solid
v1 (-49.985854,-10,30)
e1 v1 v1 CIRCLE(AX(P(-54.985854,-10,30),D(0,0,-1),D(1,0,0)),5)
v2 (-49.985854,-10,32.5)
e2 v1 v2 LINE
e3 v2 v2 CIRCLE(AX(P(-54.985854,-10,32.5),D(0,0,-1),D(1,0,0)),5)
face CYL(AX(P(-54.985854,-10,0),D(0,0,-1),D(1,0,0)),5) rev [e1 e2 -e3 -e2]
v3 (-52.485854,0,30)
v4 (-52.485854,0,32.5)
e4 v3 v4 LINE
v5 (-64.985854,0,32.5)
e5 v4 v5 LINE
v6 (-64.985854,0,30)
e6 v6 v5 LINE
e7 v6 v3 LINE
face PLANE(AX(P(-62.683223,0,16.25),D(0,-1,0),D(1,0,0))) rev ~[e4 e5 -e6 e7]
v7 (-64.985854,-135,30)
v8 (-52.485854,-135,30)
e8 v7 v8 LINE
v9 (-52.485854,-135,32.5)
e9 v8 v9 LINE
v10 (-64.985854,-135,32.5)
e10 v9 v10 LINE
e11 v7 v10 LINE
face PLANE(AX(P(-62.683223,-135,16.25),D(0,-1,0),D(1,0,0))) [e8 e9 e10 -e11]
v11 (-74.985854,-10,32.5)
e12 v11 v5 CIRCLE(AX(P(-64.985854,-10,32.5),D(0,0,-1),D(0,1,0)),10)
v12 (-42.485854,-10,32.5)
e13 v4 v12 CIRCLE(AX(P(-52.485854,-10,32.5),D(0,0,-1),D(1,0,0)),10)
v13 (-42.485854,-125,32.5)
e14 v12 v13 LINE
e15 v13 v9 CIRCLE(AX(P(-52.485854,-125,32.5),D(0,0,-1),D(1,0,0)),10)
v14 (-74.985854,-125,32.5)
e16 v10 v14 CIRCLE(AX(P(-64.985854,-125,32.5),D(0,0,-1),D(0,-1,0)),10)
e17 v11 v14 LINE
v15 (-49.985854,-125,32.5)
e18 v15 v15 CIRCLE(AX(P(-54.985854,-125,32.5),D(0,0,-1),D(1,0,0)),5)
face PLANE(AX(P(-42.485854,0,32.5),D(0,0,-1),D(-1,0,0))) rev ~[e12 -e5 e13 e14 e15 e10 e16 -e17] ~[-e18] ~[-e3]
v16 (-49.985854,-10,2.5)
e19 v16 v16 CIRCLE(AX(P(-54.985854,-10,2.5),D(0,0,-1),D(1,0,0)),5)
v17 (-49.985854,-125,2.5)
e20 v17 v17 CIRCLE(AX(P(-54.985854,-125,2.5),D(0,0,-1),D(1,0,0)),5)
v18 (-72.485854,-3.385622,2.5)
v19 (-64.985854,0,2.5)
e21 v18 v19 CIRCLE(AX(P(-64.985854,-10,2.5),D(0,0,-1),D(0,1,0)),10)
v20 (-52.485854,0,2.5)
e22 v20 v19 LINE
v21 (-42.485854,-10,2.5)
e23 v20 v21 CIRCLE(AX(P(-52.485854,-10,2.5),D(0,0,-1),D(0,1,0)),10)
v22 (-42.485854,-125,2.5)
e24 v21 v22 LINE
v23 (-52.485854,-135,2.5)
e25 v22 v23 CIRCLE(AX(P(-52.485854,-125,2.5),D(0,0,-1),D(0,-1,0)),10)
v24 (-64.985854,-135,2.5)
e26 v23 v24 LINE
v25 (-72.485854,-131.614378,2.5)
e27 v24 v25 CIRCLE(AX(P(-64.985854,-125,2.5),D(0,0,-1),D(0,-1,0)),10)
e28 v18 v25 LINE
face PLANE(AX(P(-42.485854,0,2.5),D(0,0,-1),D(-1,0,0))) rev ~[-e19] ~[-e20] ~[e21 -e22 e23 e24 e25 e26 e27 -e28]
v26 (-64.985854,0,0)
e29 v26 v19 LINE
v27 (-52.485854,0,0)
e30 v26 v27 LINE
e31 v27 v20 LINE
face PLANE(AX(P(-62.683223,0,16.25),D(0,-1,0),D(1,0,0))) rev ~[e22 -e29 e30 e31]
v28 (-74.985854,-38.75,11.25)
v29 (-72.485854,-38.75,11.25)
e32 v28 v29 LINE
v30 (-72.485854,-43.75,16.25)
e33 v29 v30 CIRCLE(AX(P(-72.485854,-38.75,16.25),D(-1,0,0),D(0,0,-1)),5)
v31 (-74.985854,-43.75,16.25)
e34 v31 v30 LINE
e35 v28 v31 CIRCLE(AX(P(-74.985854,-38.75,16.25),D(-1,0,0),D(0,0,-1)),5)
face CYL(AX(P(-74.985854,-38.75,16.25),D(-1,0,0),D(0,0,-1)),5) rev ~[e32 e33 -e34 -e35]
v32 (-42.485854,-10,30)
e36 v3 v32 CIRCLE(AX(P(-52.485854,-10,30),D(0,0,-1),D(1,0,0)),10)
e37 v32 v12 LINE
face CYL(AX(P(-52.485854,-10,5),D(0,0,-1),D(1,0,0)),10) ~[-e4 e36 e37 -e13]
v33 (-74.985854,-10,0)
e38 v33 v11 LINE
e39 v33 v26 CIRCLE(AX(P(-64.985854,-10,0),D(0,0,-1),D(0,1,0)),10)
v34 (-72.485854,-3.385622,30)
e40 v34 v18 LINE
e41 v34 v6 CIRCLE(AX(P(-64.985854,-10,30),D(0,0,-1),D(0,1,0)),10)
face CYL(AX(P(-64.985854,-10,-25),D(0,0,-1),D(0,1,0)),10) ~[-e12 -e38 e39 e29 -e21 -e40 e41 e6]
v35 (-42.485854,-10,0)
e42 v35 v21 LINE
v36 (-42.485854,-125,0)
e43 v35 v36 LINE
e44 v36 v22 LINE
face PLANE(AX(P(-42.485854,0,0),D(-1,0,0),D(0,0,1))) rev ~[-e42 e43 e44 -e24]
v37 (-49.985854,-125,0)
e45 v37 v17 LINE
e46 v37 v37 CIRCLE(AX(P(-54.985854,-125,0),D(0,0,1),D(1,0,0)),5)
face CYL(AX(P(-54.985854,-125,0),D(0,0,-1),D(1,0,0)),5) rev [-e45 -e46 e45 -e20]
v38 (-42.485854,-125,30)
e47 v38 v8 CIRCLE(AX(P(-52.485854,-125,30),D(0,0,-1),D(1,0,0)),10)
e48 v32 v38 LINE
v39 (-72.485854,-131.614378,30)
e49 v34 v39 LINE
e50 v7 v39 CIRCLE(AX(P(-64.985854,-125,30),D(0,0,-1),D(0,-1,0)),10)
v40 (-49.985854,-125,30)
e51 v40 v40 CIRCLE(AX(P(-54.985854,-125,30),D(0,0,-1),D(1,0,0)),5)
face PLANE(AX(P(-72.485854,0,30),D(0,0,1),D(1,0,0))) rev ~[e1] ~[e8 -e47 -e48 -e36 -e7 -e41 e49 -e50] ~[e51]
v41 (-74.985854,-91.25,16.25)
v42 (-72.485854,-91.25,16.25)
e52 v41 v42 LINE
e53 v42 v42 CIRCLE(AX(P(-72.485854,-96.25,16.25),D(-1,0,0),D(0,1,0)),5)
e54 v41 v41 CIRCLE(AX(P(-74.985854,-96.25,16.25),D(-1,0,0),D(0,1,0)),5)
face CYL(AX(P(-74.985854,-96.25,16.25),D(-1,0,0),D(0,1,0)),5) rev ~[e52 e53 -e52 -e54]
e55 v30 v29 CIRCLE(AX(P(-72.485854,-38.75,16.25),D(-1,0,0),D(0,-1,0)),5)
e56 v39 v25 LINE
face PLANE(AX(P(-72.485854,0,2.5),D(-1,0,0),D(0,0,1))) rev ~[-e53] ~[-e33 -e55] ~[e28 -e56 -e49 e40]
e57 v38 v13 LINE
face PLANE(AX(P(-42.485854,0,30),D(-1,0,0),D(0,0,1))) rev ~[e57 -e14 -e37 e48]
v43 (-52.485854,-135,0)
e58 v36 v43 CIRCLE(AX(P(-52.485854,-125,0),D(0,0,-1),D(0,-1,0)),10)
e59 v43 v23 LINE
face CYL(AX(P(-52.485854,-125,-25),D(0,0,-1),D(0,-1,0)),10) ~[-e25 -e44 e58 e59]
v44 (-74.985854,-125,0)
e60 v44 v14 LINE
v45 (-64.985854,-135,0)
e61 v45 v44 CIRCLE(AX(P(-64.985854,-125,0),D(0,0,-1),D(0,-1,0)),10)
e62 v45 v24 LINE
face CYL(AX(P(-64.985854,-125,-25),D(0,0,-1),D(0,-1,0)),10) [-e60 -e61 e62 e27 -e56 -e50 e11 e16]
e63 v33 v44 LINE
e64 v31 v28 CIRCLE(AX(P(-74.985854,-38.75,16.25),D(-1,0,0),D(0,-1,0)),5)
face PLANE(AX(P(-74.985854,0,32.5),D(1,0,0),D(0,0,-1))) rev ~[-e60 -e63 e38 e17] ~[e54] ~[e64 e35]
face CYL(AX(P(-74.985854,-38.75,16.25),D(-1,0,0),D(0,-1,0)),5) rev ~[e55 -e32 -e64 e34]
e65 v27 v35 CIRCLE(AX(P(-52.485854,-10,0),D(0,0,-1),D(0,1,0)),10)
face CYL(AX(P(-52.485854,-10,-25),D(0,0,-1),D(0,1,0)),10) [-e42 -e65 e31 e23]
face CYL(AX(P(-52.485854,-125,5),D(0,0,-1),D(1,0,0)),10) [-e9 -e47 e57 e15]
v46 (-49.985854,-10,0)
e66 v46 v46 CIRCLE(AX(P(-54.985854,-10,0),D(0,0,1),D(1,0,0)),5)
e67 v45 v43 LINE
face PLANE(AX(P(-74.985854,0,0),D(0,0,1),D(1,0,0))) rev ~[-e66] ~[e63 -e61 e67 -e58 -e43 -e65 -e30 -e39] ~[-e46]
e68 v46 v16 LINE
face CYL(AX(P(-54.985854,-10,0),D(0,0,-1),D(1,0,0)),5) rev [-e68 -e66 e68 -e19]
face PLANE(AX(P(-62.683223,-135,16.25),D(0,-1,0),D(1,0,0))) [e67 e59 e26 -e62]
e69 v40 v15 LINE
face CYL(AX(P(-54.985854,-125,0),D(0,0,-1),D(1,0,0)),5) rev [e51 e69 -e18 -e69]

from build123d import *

# Parameters (mm, degrees)
F2_DEPTH    = 135
F1_R        = 5
F3_DEPTH    = 46
F4_T1_DEPTH = 52.5
F4_T3_DEPTH = 52.5
F4_T5_DEPTH = 82.5
F7_DEPTH    = 25


# Not quite as in the source:
# - a fillet or chamfer that OpenCascade refuses, or shapes differently, is made with other operations: its cross-section is extruded or revolved along the edge and cut away or added


with BuildPart() as f2:
    # F0 (on Front) → F2 (new body)
    with BuildSketch(Plane.XZ):
        Polygon((-74.9858543277, 32.5), (-74.9858543277, 0), (-42.4858543277, 0), (-42.4858543277, 2.5), (-72.4858543277, 2.5), (-72.4858543277, 30), (-42.4858543277, 30), (-42.4858543277, 32.5), align=None)
    extrude(amount=F2_DEPTH)

    # F1 (on Top) → F3 (cut)
    with BuildSketch(Plane.XY):
        with Locations((-54.9858543277, -260)):
            Circle(F1_R)
        with Locations((-54.9858543277, -125)):
            Circle(F1_R)
        with Locations((-54.9858543277, -10)):
            Circle(F1_R)
    extrude(amount=F3_DEPTH, mode=Mode.SUBTRACT)

    # F4: fillet of radius 10 on 6 edges, made by hand

    # F4_s2 → F4_t1 (cut)
    with BuildSketch(Plane.XY.offset(-25)):
        with BuildLine():
            ThreePointArc((-52.4858543277, 0), (-45.4147865158, -2.9289321881), (-42.4858543277, -10))
            Line((-42.4858543277, -10), (-42.4858543277, 0))
            Line((-42.4858543277, 0), (-52.4858543277, 0))
        make_face()
        with BuildLine():
            ThreePointArc((-52.4858543277, -135), (-45.4147865158, -132.0710678119), (-42.4858543277, -125))
            Line((-42.4858543277, -125), (-42.4858543277, -135))
            Line((-42.4858543277, -135), (-52.4858543277, -135))
        make_face()
    extrude(amount=F4_T1_DEPTH, mode=Mode.SUBTRACT)

    # F4_s4 → F4_t3 (cut)
    with BuildSketch(Plane.XY.offset(5)):
        with BuildLine():
            ThreePointArc((-42.4858543277, -10), (-45.4147865158, -2.9289321881), (-52.4858543277, 0))
            Line((-52.4858543277, 0), (-42.4858543277, 0))
            Line((-42.4858543277, 0), (-42.4858543277, -10))
        make_face()
        with BuildLine():
            ThreePointArc((-42.4858543277, -125), (-45.4147865158, -132.0710678119), (-52.4858543277, -135))
            Line((-52.4858543277, -135), (-42.4858543277, -135))
            Line((-42.4858543277, -135), (-42.4858543277, -125))
        make_face()
    extrude(amount=F4_T3_DEPTH, mode=Mode.SUBTRACT)

    # F4_s6 → F4_t5 (cut)
    with BuildSketch(Plane.XY.offset(-25)):
        with BuildLine():
            ThreePointArc((-64.9858543277, 0), (-72.0569221395, -2.9289321881), (-74.9858543277, -10))
            Line((-74.9858543277, -10), (-74.9858543277, 0))
            Line((-74.9858543277, 0), (-64.9858543277, 0))
        make_face()
        with BuildLine():
            ThreePointArc((-64.9858543277, -135), (-72.0569221395, -132.0710678119), (-74.9858543277, -125))
            Line((-74.9858543277, -125), (-74.9858543277, -135))
            Line((-74.9858543277, -135), (-64.9858543277, -135))
        make_face()
    extrude(amount=F4_T5_DEPTH, mode=Mode.SUBTRACT)

    # F6 (on offset) → F7 (cut)
    with BuildSketch(Plane(origin=(-74.9858543277, 0, 0), x_dir=(0, -1, 0), z_dir=(-1, 0, 0))):
        with BuildLine():
            Line((38.75, 16.25), (43.75, 16.25))
            ThreePointArc((43.75, 16.25), (35.2144660941, 19.7855339059), (38.75, 11.25))
            Line((38.75, 11.25), (38.75, 16.25))
        make_face()
        with BuildLine():
            ThreePointArc((38.75, 11.25), (42.2855339059, 12.7144660941), (43.75, 16.25))
            Line((43.75, 16.25), (38.75, 16.25))
            Line((38.75, 16.25), (38.75, 11.25))
        make_face()
        with BuildLine():
            ThreePointArc((101.25, 16.25), (96.25, 21.25), (91.25, 16.25))
            ThreePointArc((91.25, 16.25), (96.25, 11.25), (101.25, 16.25))
        make_face()
    extrude(amount=-F7_DEPTH, mode=Mode.SUBTRACT)


solid = f2.part
